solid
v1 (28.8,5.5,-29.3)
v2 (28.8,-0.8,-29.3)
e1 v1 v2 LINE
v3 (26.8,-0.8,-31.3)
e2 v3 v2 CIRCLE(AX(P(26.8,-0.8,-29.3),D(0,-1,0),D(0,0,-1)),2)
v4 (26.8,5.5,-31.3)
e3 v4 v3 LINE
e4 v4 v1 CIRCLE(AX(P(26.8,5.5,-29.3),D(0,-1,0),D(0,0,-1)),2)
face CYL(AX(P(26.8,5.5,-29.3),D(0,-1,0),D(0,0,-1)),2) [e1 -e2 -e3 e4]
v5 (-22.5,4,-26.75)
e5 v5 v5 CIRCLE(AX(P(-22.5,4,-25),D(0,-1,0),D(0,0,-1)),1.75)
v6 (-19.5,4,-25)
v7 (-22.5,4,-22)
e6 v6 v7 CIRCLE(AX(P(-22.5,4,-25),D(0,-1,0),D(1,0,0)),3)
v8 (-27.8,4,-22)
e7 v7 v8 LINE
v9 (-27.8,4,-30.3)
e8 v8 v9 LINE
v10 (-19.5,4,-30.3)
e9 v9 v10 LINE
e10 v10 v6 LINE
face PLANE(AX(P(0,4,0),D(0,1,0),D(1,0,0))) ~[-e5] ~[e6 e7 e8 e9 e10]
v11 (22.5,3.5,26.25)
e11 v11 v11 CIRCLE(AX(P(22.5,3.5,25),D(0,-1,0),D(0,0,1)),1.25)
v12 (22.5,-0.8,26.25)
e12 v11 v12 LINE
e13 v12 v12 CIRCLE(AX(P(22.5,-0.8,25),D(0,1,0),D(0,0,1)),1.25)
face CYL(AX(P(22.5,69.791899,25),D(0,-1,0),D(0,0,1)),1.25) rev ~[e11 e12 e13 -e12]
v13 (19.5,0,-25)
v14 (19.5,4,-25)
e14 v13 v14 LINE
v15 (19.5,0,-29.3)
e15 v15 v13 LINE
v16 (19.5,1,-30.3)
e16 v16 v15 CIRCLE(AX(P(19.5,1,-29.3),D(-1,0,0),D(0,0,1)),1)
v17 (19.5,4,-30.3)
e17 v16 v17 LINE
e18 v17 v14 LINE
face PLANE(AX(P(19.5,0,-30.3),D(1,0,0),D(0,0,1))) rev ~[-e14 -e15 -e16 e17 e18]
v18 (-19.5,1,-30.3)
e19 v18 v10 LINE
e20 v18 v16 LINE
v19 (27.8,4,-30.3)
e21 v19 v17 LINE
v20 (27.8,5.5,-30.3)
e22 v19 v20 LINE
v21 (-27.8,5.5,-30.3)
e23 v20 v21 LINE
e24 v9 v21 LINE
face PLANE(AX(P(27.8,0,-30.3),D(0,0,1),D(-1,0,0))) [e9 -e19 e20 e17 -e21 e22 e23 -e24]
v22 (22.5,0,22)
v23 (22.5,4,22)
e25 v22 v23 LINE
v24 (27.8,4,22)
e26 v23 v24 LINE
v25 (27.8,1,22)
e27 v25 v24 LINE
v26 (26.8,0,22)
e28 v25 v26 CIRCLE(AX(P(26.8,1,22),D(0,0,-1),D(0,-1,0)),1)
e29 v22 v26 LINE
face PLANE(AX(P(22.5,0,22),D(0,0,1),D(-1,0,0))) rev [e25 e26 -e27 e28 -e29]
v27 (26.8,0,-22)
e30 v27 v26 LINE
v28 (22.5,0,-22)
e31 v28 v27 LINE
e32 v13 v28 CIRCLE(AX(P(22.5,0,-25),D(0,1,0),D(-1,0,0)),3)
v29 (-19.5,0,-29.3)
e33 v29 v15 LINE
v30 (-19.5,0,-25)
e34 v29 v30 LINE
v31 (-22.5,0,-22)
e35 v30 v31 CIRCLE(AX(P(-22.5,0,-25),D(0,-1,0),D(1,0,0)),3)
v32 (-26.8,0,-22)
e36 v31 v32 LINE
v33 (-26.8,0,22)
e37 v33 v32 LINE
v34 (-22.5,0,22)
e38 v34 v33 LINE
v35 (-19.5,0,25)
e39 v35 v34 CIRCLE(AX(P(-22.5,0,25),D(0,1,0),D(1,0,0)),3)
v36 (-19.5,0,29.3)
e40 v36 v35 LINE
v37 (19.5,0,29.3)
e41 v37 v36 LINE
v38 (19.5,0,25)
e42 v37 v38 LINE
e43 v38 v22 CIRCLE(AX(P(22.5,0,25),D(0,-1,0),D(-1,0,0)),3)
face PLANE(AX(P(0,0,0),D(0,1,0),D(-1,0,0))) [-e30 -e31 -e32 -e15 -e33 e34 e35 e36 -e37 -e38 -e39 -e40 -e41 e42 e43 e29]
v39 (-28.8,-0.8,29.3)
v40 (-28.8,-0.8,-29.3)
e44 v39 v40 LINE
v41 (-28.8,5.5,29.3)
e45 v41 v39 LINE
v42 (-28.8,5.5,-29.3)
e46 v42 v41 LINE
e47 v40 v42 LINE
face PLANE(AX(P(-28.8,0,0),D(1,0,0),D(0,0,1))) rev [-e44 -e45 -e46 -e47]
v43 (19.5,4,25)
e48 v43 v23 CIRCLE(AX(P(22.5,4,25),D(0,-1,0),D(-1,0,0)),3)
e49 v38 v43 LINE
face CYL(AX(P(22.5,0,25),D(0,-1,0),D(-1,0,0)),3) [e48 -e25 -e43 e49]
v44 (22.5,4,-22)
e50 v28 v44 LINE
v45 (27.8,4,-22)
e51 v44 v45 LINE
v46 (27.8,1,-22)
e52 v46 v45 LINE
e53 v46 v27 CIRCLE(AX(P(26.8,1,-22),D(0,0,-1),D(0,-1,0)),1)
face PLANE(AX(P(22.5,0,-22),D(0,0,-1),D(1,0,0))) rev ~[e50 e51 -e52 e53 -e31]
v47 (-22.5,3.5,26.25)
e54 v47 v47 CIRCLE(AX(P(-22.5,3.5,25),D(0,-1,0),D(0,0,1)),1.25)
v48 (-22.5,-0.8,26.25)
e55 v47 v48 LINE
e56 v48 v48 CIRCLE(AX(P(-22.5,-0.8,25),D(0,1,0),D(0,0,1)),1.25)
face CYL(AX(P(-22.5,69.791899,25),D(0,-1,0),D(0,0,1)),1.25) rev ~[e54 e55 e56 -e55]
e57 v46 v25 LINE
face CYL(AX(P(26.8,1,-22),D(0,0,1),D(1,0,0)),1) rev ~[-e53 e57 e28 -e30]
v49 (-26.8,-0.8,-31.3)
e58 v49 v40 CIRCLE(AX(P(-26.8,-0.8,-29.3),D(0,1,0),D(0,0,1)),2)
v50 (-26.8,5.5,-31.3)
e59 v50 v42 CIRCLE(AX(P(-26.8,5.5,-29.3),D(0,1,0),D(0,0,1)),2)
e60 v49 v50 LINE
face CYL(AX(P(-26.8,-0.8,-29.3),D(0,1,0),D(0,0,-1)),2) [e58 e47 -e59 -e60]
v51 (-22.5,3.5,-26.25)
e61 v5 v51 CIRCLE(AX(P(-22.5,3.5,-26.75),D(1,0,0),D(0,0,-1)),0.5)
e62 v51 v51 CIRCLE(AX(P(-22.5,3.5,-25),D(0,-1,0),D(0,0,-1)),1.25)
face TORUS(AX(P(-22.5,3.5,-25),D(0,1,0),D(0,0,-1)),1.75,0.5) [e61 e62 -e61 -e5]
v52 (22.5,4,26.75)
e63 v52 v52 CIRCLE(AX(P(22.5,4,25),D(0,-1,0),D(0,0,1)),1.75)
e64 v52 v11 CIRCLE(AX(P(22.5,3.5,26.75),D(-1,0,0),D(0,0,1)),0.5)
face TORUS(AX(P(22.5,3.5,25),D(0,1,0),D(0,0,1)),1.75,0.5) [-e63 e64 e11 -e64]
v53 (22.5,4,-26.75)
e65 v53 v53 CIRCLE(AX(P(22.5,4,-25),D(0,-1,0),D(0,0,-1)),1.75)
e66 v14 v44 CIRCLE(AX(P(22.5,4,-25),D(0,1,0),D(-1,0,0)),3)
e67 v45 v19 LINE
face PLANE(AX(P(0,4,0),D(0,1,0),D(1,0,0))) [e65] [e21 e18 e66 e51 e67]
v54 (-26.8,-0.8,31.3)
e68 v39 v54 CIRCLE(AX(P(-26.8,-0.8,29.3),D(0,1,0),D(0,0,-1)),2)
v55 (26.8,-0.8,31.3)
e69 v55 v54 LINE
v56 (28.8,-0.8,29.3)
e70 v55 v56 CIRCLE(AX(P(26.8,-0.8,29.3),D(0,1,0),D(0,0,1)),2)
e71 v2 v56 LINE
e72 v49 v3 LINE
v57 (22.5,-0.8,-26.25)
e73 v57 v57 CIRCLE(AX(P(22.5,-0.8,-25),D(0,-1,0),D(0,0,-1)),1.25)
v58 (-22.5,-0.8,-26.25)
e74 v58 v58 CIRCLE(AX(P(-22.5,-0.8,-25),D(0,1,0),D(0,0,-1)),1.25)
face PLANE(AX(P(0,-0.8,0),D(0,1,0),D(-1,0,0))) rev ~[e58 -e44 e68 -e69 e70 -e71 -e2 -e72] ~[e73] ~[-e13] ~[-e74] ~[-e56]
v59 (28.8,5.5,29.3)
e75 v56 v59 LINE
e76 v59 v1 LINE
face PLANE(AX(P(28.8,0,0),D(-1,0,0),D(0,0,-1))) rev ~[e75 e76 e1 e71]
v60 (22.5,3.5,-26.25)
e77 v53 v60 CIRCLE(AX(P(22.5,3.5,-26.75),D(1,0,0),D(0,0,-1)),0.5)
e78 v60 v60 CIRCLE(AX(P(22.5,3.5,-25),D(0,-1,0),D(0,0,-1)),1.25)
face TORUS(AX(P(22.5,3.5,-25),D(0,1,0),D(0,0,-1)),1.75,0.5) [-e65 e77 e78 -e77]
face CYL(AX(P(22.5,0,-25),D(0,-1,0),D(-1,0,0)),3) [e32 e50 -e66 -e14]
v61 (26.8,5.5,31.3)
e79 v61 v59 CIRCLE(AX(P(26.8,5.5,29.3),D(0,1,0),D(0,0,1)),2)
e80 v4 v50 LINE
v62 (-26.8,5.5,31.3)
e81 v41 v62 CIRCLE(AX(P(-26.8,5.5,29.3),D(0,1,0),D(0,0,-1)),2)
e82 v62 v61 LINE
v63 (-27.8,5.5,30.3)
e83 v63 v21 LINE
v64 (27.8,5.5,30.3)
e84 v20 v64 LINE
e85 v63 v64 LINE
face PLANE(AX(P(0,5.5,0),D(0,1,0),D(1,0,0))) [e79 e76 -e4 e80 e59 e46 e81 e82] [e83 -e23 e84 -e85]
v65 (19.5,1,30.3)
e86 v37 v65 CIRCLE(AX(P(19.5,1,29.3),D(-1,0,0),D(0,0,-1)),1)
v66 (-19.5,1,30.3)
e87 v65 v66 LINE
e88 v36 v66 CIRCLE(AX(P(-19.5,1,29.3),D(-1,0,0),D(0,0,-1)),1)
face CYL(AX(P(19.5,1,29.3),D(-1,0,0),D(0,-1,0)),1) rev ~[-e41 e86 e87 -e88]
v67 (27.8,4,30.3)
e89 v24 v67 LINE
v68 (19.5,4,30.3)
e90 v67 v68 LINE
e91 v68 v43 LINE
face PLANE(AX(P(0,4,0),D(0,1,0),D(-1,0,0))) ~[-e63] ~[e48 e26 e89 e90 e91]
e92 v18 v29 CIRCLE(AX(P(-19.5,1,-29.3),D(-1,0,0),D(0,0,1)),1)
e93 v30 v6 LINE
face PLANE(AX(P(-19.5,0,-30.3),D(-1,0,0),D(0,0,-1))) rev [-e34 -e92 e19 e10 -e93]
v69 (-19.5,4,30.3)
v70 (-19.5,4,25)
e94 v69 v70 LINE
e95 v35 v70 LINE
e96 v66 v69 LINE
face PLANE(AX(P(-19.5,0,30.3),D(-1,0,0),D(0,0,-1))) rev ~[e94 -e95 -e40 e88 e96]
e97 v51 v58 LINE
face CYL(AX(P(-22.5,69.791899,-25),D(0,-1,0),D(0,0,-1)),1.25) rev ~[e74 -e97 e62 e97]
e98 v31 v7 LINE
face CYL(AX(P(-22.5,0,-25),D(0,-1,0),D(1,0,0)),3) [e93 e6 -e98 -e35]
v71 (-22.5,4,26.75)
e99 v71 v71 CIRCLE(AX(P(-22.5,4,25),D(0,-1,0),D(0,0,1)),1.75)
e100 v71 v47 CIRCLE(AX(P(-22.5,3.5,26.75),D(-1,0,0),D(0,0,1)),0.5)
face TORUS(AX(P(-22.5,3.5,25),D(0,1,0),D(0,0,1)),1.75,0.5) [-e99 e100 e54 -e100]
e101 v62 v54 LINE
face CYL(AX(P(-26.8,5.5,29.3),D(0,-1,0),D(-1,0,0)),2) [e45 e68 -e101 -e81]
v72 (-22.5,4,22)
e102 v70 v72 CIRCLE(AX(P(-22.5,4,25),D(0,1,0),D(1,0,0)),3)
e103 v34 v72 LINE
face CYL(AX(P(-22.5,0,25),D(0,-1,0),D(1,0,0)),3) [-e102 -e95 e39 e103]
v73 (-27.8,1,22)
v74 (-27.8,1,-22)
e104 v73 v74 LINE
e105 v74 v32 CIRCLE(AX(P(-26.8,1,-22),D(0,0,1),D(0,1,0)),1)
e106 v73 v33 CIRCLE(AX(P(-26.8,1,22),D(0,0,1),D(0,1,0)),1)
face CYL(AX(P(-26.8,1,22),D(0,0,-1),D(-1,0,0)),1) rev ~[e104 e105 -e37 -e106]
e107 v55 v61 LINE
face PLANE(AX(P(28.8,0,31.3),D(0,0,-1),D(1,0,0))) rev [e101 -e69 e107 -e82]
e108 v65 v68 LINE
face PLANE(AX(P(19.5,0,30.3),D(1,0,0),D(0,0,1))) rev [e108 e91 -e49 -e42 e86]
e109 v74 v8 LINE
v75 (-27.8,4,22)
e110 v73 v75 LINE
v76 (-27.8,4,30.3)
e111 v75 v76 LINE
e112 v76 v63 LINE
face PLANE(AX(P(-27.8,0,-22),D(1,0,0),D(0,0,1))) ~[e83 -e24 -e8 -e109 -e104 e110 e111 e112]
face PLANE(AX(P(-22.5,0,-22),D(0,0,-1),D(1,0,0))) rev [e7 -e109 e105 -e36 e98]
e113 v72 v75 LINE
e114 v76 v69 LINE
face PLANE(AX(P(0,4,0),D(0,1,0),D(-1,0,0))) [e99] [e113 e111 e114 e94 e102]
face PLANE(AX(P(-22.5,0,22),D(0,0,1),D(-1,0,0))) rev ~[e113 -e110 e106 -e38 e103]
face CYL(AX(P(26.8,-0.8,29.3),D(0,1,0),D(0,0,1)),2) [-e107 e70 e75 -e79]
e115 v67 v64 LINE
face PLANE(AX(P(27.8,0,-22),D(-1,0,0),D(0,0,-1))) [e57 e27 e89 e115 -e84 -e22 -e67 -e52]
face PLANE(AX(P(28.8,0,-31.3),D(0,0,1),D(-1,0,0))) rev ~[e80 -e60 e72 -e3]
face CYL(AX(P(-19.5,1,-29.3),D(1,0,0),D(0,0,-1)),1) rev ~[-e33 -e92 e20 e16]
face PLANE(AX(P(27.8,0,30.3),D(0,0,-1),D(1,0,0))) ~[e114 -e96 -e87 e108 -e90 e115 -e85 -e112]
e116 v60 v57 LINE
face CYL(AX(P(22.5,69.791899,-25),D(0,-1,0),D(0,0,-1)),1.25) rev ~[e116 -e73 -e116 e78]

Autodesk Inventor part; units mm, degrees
ref_plane "YZ Plane" through (0, 0, 0) normal (1, 0, 0) x (0, 1, 0)
ref_plane "XZ Plane" through (0, 0, 0) normal (0, 1, 0) x (-1, 0, 0)
ref_plane "XY Plane" through (0, 0, 0) normal (0, 0, 1) x (1, 0, 0)
sketch "スケッチ1" plane through (0, 0, 0) normal (0, 1, 0) x (-1, 0, 0)
  line L0 (27.5, 30) -> (-27.5, 30) construction
  line L1 (-27.5, 30) -> (-27.5, -30) construction
  line L2 (-27.5, -30) -> (27.5, -30) construction
  line L3 (27.5, -30) -> (27.5, 30) construction
  line L4 (27.5, 30) -> (-27.5, -30) construction
  line L5 (-27.5, 30) -> (27.5, -30) construction
  line L6 (27.8, 30.3) -> (-27.8, 30.3)
  line L7 (-27.8, 30.3) -> (-27.8, -30.3)
  line L8 (-27.8, -30.3) -> (27.8, -30.3)
  line L9 (27.8, -30.3) -> (27.8, 30.3)
  line L10 (28.8, 31.3) -> (-28.8, 31.3)
  line L11 (-28.8, 31.3) -> (-28.8, -31.3)
  line L12 (-28.8, -31.3) -> (28.8, -31.3)
  line L13 (28.8, -31.3) -> (28.8, 31.3)
  line L14 (-22.5, 25) -> (22.5, 25) construction
  line L15 (22.5, 25) -> (22.5, -25) construction
  line L16 (22.5, -25) -> (-22.5, -25) construction
  line L17 (-22.5, -25) -> (-22.5, 25) construction
  line L18 (19.5, 30.3) -> (19.5, 25)
  arc A0 (19.5, 25) -> (22.5, 22) centre (22.5, 25) ccw
  line L19 (22.5, 22) -> (27.8, 22)
  line L20 (0, 0) -> (0, 30.3)
  line L21 (0, 30.3) -> (0, 31.3)
  line L22 (0, 0) -> (27.8, 0)
  line L23 (27.8, 0) -> (28.8, 0)
  dimension "d0" = 55
  dimension "d1" = 60
  dimension "d2" = 0.3
  dimension "d3" = 1
  dimension "d4" = 5
  dimension "d5" = 3
extrude "押し出し1" add sketch "スケッチ1" against normal blind 0.8 contours L9 L19 A0 L18 L6 | L6 L21 L10 L13 L23 L9 | L18 A0 L19 L9 L22 L20 L6
extrude "押し出し2" add sketch "スケッチ1" along normal blind 4 contours L9 L19 A0 L18 L6
extrude "押し出し3" add sketch "スケッチ1" along normal blind 5.5 contours L6 L21 L10 L13 L23 L9
hole "穴1" at (22.5, 0, 25) at (-22.5, 0, 25) at (-22.5, 0, -25) at (22.5, 0, -25) direction (0, -1, 0) diameter 2.5 end through all both
fillet "フィレット1" radius 0.5 1 edges at (-22.5, 4, 23.75)
mirror "ミラー1" about plane through (-28.8, 0, 0) normal (0, 0, -1) of "フィレット1", "穴1", "押し出し3", "押し出し2", "押し出し1"
mirror "ミラー2" about plane through (0, 0, 30.3) normal (1, 0, 0) of "フィレット1", "穴1", "押し出し3", "押し出し2", "押し出し1", "ミラー1"
fillet "フィレット2" radius 1 4 edges at (-27.8, 0, 0) (0, 0, 30.3) (27.8, 0, 0) (0, 0, -30.3)
fillet "フィレット3" radius 2 4 edges at (28.8, 2.35, 31.3) (-28.8, 2.35, 31.3) (-28.8, 2.35, -31.3) (28.8, 2.35, -31.3)
properties part number "MD_hf_base_sa_1" material "ABS プラスチック"
